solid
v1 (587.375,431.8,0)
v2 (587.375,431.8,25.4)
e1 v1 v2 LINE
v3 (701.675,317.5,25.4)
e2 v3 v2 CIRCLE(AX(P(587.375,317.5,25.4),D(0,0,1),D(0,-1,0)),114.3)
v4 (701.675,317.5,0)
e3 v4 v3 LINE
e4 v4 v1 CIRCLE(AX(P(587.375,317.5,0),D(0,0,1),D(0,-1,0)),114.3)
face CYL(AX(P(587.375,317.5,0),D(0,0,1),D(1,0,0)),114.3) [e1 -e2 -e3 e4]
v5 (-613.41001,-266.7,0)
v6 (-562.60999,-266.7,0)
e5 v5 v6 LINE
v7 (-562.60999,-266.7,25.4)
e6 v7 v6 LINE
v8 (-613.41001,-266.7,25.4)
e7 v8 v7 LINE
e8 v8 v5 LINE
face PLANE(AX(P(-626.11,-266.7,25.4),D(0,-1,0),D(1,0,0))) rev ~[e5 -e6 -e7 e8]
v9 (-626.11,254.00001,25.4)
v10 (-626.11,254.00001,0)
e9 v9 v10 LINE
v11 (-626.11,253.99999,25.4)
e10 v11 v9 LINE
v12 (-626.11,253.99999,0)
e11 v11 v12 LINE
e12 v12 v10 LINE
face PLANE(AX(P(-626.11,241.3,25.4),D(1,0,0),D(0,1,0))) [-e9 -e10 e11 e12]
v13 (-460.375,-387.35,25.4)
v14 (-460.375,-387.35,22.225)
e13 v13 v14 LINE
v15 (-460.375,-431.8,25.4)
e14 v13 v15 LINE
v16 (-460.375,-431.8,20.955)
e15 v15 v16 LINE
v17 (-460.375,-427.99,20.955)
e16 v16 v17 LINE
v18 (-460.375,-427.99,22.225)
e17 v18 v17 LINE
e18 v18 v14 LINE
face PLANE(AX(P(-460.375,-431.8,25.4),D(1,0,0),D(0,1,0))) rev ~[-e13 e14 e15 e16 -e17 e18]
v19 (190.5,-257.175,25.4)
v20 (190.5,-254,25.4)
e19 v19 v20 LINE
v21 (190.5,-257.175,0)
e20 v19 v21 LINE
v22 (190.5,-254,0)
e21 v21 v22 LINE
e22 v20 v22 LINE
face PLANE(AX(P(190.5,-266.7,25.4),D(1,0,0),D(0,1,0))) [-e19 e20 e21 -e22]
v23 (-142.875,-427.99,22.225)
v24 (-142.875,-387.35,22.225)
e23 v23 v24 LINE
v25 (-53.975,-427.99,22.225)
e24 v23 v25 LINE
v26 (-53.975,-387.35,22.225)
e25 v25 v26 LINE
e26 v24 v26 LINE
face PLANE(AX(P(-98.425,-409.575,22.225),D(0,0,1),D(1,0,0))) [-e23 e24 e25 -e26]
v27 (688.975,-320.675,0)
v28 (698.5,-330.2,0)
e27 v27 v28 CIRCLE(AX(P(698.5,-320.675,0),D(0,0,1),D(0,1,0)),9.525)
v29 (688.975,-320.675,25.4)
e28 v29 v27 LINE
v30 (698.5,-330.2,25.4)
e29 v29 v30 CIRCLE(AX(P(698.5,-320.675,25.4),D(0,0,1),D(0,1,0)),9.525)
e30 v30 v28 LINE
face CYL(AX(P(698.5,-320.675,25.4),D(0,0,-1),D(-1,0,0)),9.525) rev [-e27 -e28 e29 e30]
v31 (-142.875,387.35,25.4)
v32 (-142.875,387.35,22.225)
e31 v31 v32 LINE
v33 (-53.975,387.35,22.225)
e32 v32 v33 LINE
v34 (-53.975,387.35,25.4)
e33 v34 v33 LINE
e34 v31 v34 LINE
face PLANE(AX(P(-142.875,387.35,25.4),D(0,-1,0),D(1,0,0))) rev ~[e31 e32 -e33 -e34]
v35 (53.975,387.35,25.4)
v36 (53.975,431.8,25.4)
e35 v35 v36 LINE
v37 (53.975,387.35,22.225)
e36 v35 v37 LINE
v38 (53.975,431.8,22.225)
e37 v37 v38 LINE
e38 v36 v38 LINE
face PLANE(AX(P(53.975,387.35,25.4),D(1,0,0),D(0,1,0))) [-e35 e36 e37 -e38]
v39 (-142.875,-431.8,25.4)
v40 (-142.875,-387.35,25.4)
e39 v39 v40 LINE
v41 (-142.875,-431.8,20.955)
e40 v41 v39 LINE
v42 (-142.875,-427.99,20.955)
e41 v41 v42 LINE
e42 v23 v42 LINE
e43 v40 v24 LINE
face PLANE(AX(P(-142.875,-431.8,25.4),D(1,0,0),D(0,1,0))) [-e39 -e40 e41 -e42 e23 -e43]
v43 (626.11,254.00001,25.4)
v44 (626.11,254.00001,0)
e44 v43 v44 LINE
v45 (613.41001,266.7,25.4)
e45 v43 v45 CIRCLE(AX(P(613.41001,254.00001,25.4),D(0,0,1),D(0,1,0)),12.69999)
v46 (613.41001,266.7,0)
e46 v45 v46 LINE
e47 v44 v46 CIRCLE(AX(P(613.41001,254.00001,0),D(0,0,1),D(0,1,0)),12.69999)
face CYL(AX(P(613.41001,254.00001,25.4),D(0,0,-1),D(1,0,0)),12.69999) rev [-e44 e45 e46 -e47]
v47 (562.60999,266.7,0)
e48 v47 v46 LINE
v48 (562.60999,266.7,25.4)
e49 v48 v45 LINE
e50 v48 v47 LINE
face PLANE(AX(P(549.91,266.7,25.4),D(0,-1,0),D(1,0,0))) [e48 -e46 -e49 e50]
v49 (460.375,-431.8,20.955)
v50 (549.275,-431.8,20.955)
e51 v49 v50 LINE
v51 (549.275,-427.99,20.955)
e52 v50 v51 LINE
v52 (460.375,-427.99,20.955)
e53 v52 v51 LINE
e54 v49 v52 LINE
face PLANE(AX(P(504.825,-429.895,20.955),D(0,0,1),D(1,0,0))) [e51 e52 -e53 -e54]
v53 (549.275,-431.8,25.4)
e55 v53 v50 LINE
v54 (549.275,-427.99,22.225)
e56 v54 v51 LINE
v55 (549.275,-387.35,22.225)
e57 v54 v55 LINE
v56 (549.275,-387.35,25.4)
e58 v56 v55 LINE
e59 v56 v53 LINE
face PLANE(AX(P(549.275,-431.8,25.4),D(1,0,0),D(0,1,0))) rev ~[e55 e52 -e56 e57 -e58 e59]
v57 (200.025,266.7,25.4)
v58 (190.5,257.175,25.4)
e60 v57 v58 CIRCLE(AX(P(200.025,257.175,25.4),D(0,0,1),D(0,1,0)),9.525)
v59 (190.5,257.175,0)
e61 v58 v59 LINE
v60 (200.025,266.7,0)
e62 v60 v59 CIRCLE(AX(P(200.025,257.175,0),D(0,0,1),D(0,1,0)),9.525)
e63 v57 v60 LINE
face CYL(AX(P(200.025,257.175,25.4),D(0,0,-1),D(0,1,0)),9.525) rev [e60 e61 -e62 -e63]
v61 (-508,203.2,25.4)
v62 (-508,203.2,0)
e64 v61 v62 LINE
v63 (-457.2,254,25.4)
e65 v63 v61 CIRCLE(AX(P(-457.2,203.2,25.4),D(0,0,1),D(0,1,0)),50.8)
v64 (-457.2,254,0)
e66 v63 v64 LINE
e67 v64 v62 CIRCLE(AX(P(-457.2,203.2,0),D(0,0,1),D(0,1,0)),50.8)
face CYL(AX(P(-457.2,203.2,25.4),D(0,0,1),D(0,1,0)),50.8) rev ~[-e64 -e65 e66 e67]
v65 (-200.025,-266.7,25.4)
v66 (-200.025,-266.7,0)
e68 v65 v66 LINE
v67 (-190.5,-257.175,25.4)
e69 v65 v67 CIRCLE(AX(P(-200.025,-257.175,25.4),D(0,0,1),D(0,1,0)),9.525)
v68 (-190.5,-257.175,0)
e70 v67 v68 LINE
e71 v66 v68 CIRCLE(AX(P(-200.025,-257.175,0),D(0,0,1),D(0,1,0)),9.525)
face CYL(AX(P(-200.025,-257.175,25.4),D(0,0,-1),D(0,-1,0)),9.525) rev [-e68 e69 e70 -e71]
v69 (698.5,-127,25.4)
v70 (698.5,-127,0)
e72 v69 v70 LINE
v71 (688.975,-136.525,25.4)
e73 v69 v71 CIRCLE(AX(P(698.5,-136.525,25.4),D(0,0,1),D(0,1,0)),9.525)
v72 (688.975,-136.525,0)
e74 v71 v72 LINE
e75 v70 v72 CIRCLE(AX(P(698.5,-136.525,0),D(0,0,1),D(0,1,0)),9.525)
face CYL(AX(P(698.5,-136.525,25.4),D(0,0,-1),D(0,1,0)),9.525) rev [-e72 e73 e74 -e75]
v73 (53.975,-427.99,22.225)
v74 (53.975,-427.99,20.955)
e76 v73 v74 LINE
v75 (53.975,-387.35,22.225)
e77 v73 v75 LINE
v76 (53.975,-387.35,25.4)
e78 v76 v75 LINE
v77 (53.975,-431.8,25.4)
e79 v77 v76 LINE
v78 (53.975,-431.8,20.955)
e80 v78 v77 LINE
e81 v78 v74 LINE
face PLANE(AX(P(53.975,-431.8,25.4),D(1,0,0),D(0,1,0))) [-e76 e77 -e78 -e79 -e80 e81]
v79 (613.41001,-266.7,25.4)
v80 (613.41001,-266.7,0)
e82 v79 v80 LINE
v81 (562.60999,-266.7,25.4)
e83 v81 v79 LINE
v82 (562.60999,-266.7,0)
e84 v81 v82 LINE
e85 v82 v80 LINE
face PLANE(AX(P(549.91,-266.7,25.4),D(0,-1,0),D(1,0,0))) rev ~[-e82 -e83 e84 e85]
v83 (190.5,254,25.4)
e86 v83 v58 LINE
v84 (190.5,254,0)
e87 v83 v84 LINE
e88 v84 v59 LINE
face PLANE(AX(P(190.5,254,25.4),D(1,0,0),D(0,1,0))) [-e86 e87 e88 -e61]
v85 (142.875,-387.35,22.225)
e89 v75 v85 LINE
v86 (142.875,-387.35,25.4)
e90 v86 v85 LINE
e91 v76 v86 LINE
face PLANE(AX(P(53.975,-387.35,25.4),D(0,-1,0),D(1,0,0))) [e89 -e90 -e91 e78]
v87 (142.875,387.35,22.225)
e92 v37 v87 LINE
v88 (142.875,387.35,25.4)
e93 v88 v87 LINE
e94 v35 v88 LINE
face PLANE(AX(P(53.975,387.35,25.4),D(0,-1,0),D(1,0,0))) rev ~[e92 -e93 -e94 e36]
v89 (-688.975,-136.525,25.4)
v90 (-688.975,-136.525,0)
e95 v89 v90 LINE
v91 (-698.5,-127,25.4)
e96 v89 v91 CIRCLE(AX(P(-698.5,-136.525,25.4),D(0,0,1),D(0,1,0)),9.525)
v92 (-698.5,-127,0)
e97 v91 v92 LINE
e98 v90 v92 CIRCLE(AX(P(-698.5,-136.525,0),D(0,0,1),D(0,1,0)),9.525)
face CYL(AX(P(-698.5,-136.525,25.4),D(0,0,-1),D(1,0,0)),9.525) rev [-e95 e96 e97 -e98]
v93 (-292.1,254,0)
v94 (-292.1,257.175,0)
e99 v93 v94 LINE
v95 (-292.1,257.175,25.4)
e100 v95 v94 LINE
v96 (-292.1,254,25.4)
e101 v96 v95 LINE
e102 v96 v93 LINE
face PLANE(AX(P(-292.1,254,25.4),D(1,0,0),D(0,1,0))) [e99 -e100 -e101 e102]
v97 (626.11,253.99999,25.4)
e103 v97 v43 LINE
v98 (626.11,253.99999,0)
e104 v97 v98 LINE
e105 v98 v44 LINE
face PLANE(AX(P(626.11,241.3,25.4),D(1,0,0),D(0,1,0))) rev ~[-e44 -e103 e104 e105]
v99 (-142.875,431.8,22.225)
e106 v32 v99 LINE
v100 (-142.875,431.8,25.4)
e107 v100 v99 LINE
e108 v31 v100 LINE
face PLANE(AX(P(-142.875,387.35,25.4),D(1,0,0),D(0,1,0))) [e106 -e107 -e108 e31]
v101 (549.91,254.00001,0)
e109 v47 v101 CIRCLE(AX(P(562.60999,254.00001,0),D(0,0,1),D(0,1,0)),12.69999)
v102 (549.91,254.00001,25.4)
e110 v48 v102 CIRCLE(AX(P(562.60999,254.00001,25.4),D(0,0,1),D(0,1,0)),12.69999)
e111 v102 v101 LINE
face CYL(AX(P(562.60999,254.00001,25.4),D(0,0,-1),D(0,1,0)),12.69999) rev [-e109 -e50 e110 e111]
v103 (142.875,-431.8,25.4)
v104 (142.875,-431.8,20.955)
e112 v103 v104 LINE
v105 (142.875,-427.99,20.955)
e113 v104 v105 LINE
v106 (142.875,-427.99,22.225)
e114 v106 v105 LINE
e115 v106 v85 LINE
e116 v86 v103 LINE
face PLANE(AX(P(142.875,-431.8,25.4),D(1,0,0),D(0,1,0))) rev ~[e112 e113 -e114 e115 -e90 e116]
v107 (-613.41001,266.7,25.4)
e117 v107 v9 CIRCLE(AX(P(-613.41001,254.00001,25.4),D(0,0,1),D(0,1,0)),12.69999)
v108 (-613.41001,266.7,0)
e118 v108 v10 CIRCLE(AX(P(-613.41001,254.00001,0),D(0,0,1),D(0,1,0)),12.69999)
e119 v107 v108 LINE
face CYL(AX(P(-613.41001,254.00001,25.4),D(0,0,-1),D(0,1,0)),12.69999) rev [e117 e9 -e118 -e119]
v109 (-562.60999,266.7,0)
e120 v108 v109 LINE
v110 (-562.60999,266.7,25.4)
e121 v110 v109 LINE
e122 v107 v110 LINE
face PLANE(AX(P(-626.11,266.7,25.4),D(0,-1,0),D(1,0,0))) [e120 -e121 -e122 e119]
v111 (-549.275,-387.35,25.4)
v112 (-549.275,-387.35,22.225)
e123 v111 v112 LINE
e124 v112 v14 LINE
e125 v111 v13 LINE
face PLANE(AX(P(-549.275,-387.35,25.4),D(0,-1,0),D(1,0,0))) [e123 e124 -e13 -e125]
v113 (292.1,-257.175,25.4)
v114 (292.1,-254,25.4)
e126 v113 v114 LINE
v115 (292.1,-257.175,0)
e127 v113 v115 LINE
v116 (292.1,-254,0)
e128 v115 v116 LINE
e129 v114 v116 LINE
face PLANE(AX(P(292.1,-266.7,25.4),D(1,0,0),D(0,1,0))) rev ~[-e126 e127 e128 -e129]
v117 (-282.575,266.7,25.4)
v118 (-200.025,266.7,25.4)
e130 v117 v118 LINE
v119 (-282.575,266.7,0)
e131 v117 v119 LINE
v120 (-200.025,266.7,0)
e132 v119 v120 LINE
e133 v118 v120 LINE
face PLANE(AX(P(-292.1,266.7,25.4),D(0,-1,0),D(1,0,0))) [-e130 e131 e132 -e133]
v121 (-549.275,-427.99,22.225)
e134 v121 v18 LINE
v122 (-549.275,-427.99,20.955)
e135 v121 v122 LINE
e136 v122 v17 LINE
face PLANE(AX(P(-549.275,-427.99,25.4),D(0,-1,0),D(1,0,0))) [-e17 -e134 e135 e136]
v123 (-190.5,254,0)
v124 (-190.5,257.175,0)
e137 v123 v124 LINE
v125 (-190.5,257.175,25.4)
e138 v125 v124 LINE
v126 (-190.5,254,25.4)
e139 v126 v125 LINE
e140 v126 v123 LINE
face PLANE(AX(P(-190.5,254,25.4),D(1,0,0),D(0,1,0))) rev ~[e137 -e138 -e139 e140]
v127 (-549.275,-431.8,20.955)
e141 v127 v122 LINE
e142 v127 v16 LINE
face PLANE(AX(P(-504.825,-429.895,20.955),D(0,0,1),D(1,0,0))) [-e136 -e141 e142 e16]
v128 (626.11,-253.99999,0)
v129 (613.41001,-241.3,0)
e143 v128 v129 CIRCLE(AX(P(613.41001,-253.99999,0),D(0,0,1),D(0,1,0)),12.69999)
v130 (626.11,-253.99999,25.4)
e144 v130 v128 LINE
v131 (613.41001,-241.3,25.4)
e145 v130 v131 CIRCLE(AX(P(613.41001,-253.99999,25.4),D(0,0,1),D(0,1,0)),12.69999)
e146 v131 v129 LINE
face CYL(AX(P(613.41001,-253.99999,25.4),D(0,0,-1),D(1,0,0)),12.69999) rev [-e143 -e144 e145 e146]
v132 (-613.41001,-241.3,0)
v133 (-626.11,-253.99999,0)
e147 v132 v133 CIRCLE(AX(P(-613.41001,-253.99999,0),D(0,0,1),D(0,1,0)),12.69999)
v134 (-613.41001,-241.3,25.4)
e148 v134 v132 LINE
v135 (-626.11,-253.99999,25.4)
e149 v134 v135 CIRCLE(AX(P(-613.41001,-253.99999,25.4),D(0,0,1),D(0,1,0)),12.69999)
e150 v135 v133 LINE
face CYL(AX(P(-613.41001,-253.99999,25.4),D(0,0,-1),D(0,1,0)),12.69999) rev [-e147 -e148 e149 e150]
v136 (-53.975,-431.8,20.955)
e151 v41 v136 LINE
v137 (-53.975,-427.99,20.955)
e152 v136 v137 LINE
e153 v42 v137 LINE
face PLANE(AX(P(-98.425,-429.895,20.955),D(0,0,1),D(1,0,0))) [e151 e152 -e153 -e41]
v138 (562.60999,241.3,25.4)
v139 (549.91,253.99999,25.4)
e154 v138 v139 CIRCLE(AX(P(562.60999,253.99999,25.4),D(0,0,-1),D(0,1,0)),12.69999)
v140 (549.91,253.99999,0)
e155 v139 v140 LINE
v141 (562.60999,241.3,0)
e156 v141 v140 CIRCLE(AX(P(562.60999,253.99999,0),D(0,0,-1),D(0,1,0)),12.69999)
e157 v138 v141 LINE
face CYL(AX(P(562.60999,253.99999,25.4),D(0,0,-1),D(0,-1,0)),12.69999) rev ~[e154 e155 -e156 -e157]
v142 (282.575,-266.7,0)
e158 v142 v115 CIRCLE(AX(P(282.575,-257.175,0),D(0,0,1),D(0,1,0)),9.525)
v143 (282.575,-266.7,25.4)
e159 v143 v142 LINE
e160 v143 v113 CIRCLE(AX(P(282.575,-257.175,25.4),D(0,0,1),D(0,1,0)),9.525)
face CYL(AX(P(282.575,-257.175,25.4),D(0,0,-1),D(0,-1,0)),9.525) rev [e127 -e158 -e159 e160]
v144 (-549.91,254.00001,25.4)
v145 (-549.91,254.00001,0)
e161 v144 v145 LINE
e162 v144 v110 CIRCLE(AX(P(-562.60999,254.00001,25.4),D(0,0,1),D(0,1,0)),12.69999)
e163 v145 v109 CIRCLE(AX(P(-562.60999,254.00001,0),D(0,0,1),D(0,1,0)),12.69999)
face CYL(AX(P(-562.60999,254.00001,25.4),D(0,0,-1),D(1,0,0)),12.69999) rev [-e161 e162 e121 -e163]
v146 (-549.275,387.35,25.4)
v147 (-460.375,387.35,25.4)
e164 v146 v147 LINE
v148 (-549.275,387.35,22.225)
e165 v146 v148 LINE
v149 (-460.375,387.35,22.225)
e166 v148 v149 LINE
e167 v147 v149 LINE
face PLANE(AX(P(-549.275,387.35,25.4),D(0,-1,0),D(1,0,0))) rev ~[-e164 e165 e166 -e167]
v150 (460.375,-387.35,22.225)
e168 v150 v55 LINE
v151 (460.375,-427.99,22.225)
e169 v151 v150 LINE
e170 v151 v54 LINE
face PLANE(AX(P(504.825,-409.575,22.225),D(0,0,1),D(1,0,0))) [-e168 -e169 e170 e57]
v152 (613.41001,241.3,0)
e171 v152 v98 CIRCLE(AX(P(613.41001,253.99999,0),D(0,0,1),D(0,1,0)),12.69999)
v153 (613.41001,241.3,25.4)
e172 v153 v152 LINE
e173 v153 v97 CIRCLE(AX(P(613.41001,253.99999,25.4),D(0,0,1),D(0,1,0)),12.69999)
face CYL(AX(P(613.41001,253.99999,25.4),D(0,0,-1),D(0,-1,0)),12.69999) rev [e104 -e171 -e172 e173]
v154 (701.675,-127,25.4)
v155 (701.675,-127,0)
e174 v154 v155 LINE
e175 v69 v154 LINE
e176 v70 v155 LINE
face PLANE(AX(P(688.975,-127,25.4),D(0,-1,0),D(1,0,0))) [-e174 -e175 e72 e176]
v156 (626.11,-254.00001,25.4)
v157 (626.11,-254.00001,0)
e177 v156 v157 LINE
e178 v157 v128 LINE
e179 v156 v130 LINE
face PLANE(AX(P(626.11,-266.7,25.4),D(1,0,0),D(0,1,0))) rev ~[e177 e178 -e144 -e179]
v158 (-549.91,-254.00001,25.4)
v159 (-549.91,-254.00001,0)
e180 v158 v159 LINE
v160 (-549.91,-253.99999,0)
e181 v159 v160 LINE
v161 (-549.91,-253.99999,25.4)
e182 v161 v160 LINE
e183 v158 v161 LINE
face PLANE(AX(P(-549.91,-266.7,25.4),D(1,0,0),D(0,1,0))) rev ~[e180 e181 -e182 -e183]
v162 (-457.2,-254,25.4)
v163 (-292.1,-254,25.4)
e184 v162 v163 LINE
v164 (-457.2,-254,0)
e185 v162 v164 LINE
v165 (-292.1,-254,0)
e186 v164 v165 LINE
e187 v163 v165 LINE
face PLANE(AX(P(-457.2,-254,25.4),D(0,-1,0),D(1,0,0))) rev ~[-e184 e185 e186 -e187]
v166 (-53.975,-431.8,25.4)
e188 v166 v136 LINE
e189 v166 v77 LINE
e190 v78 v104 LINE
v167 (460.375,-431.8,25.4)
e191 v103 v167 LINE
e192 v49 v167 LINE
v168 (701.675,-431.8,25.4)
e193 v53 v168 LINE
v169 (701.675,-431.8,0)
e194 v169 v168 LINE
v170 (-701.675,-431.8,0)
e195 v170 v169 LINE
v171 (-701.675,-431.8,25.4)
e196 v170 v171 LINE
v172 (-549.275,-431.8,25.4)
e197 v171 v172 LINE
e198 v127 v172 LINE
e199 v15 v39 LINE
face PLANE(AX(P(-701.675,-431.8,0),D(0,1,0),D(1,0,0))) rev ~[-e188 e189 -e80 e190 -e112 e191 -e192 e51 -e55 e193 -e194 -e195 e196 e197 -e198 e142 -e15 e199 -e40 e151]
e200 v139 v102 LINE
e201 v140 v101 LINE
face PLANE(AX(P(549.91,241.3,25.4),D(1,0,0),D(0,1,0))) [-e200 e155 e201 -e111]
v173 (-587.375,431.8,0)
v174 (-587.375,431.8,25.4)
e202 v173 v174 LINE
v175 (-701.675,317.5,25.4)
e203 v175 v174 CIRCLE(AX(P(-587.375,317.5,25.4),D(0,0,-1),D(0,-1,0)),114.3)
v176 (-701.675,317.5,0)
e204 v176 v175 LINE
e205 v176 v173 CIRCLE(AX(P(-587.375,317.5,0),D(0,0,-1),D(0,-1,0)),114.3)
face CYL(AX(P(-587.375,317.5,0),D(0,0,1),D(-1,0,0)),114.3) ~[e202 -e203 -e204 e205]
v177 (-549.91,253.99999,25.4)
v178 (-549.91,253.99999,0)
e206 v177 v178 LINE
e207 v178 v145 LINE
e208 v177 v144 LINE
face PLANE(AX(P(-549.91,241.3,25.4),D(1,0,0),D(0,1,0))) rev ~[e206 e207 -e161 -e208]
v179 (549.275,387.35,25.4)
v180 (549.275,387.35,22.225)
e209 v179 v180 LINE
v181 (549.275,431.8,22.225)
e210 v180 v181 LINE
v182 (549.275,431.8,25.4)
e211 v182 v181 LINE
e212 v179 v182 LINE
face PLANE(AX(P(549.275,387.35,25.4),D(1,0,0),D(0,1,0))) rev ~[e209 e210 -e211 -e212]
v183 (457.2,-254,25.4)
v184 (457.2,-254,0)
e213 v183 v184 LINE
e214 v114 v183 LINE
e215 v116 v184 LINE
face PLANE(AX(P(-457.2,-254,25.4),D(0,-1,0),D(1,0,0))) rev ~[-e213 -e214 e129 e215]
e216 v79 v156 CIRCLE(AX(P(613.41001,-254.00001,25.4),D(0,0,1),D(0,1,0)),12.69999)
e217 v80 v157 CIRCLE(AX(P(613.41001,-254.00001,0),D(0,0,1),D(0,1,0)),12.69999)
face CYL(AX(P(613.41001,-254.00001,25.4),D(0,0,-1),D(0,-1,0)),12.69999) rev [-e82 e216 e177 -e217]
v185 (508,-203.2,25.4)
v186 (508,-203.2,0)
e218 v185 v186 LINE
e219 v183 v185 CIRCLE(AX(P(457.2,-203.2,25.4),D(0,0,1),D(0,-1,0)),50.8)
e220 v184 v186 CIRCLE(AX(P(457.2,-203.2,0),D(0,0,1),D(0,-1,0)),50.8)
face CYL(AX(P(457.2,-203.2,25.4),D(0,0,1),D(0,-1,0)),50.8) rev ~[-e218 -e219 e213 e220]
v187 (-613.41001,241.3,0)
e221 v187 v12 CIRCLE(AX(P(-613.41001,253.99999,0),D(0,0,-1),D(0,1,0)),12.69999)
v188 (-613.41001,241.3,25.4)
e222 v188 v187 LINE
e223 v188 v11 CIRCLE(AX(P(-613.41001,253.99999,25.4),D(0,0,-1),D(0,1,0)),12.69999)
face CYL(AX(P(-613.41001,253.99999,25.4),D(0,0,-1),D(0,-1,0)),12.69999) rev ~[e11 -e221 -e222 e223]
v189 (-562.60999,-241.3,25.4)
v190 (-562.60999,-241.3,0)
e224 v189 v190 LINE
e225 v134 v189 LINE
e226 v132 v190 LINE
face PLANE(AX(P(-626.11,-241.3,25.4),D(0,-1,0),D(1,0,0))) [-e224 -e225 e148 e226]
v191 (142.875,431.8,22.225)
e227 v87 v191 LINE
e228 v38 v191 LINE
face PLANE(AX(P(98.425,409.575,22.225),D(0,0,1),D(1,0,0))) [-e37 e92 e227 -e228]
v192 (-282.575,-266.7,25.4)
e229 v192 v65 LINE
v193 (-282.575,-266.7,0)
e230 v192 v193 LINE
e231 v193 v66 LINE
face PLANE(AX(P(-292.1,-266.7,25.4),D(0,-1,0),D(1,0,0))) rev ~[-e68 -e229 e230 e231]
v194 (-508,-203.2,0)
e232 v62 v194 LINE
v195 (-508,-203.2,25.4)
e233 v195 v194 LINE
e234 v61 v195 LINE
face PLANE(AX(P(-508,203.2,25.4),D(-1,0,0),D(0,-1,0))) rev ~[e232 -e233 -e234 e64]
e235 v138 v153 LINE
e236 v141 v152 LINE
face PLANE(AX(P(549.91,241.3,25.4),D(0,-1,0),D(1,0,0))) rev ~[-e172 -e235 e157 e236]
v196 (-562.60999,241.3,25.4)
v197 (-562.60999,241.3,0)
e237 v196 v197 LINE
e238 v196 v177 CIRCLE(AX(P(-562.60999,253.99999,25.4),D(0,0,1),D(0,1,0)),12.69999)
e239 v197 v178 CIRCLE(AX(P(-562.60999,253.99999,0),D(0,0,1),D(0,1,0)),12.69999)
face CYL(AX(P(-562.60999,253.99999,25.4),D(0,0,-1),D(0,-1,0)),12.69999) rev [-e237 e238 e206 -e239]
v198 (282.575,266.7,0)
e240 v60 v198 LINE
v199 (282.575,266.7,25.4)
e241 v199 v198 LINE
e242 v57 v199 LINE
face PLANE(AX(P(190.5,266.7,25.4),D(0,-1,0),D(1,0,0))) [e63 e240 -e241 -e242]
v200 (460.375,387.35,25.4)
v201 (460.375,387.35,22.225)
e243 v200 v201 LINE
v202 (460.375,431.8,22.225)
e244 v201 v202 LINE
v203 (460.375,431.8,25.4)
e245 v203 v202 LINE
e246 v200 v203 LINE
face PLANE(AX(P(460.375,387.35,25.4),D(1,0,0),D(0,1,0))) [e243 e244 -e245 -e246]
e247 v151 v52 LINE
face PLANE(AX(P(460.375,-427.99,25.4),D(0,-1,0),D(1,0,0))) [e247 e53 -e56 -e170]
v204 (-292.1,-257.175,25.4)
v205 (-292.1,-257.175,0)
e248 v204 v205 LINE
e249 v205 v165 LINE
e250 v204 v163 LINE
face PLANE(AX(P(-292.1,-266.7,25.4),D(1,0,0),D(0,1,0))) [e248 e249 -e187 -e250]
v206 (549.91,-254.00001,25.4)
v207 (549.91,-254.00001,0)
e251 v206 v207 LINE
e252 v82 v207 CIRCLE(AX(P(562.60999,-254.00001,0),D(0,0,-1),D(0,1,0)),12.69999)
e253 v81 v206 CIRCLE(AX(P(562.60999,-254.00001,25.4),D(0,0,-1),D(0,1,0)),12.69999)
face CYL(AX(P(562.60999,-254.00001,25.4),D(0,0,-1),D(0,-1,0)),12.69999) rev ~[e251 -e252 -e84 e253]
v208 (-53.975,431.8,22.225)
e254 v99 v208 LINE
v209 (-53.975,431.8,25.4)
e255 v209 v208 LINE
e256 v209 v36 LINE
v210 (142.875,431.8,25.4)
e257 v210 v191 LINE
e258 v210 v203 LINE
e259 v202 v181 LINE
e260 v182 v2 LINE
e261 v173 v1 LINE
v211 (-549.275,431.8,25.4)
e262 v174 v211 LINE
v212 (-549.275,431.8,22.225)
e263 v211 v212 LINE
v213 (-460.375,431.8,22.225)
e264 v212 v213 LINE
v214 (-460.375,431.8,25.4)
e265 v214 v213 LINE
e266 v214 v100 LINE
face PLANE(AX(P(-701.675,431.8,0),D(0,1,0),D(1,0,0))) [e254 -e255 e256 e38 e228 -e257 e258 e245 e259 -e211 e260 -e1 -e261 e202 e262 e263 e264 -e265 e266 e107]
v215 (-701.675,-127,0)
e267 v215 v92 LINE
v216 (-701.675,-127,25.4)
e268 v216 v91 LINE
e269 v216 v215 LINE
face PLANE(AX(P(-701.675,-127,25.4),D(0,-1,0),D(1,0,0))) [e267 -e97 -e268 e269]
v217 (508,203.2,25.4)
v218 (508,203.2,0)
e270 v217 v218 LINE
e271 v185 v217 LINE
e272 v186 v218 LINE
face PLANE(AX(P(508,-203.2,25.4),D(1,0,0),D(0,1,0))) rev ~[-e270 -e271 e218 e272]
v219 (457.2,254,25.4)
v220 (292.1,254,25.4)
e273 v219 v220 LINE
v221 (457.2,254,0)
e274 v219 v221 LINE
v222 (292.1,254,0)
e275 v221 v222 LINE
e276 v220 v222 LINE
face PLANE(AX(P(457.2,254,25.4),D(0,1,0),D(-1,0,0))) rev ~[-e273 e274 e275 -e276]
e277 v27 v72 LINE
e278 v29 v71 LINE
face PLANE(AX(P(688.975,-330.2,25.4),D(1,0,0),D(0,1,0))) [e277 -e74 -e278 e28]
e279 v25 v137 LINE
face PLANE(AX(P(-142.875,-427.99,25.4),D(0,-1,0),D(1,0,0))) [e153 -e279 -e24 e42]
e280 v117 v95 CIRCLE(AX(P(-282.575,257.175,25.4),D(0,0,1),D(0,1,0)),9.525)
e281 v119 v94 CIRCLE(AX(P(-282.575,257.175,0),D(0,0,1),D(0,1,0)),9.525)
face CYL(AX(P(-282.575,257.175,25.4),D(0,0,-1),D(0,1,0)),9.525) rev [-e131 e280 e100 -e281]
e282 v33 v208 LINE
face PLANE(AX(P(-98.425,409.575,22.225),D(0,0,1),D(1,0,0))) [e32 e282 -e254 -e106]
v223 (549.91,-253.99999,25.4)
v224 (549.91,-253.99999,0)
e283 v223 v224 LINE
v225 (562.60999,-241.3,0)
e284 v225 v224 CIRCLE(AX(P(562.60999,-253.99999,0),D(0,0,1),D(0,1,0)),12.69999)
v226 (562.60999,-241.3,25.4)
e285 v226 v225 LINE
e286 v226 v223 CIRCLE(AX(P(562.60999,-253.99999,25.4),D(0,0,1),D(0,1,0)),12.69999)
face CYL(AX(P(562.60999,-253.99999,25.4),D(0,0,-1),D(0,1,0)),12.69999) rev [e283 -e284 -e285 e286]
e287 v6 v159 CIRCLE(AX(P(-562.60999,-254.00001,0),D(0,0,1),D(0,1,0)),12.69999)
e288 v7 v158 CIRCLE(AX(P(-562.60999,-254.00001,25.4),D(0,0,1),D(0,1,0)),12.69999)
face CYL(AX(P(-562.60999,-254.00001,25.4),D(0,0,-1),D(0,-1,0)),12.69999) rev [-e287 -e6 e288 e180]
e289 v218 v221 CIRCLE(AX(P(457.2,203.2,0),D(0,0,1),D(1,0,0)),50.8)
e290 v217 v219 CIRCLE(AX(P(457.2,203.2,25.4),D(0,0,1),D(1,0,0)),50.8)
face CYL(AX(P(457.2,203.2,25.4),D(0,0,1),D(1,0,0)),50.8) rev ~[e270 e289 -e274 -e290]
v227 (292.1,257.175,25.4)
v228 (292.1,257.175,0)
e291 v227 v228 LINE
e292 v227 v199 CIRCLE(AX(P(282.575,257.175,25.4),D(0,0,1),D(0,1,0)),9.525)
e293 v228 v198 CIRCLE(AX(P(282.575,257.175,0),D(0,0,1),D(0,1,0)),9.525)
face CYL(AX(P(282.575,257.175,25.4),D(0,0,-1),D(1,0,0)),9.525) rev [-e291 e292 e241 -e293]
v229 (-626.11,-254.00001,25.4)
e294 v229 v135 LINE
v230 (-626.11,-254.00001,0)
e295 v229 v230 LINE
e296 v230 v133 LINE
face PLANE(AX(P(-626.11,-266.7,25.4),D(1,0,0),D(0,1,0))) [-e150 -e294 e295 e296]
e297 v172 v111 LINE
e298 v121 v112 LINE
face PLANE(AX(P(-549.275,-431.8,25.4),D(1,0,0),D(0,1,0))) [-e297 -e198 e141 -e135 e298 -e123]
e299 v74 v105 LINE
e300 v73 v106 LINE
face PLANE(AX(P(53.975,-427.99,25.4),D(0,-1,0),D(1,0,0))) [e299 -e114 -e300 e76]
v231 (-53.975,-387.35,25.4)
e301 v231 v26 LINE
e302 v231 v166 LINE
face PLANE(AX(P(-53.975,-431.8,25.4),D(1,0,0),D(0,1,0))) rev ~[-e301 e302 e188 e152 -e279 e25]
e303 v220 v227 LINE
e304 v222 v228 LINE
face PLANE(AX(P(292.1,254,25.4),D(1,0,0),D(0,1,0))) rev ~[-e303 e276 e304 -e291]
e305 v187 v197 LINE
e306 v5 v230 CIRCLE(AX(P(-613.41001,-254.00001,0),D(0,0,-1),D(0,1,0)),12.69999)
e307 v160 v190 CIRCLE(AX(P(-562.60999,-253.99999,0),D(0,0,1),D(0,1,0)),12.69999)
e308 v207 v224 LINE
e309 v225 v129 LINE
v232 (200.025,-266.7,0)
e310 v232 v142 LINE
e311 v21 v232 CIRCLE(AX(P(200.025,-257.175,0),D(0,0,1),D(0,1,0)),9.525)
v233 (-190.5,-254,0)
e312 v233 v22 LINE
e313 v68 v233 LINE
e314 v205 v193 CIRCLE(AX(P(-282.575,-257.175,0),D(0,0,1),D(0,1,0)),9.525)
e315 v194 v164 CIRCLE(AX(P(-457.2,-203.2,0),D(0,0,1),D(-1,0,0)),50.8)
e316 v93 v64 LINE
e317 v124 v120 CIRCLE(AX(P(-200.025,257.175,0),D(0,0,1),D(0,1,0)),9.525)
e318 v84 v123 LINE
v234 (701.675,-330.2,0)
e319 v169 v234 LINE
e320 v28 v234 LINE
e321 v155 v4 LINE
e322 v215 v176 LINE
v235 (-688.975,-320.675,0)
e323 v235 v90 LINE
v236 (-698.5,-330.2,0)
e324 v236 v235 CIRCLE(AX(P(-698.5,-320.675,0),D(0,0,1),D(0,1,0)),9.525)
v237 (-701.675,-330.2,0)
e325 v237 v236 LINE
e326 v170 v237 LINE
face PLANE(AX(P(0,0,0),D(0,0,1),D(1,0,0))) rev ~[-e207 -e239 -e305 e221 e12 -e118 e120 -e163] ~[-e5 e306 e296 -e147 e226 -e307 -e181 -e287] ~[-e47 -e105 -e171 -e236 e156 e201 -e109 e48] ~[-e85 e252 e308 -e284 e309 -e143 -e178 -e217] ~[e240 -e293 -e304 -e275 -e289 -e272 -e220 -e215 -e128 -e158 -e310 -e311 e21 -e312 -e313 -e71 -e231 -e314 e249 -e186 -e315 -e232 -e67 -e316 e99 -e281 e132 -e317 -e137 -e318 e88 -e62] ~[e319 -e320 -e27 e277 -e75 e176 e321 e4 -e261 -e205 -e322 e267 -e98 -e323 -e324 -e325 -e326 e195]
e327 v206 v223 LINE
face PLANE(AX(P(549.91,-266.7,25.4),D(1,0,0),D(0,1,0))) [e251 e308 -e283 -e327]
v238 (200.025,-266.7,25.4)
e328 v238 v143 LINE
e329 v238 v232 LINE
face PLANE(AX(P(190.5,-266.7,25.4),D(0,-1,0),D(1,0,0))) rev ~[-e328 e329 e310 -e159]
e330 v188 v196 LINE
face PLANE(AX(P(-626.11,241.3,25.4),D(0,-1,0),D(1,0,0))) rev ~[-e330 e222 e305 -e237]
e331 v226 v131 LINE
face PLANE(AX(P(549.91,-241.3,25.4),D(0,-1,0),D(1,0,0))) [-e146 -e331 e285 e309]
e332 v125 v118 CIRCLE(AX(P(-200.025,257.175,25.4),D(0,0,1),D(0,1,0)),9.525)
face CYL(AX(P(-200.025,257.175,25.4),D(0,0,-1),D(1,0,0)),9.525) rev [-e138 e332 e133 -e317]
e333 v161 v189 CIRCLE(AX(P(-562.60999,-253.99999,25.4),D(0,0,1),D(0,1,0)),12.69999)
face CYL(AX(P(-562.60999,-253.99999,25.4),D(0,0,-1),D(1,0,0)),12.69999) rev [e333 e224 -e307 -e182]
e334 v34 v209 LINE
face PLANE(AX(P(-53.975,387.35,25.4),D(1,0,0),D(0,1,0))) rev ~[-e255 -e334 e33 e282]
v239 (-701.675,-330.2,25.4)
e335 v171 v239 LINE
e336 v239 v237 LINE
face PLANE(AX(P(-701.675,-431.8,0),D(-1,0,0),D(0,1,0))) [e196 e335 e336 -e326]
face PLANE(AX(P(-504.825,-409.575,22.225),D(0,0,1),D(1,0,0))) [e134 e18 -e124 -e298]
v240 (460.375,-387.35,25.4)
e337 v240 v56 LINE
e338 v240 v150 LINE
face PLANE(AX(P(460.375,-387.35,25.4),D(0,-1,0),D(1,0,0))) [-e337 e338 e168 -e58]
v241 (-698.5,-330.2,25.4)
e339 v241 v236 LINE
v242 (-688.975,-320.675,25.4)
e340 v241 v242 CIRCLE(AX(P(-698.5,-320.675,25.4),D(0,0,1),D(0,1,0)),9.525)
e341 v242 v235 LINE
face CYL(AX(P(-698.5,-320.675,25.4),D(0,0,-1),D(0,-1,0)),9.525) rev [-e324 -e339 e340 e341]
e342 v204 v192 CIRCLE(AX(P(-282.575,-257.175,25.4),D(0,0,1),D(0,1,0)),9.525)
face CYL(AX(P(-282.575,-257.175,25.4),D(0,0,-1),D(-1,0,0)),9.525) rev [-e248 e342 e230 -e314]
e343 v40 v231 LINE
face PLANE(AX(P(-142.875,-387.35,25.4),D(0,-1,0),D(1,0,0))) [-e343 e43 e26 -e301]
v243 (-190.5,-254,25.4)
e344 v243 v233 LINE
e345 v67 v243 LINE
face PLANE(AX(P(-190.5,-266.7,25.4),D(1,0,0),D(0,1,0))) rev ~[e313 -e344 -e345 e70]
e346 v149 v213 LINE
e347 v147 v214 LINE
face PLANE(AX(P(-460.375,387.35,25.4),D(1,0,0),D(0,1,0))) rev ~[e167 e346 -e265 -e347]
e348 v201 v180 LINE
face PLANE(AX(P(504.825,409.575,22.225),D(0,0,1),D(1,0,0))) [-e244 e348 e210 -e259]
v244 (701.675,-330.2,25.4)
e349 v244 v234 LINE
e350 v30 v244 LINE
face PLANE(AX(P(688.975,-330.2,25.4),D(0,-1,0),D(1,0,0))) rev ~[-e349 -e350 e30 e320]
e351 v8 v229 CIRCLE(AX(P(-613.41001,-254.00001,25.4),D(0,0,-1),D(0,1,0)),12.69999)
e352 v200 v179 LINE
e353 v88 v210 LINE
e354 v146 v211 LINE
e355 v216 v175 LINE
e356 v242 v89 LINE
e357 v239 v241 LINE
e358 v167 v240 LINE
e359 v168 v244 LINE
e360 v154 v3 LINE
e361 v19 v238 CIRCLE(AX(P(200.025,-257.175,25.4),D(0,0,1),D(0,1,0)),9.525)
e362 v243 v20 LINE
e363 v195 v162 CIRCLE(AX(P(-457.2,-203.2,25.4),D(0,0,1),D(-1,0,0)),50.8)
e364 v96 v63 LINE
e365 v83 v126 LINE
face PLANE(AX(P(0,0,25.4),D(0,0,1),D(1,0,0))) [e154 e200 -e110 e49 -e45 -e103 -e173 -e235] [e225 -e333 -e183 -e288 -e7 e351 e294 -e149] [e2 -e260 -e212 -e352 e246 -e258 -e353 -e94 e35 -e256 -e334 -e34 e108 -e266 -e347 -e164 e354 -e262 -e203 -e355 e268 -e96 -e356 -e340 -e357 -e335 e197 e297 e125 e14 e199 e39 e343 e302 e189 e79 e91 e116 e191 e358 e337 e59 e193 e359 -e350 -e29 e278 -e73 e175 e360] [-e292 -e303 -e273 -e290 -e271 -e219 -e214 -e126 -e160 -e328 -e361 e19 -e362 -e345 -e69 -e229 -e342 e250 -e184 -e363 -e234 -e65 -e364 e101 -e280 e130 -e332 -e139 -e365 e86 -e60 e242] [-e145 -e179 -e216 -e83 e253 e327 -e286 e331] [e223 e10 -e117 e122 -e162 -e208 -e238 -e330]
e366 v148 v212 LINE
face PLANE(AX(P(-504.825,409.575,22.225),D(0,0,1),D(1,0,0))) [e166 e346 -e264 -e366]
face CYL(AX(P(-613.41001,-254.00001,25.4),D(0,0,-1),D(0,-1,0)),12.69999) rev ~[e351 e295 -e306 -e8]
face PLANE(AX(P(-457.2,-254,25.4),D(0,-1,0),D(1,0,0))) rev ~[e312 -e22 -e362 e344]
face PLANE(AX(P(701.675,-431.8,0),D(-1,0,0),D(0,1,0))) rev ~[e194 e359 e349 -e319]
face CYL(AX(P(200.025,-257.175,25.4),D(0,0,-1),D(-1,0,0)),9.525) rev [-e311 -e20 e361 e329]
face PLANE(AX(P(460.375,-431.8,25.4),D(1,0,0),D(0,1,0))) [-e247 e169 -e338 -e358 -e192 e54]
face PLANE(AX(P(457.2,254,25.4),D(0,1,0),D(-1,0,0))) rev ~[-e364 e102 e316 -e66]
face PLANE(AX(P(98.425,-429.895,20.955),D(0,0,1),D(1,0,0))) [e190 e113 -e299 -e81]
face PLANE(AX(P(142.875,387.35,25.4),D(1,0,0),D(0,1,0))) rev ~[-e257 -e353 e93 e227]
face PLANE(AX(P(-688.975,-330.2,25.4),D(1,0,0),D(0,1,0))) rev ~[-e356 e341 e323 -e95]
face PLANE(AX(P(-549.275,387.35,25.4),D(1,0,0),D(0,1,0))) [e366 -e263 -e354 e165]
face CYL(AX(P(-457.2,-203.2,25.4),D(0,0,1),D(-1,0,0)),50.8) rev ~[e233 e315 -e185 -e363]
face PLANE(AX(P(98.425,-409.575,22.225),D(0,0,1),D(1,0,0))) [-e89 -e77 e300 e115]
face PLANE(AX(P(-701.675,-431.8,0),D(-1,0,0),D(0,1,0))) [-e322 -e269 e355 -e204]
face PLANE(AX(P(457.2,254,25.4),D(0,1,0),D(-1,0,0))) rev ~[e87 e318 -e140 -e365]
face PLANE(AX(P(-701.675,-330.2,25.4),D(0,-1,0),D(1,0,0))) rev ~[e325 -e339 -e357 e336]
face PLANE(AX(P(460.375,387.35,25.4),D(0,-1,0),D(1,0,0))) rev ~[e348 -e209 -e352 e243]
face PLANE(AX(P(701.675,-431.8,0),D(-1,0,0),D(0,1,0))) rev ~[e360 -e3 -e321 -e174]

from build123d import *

# Parameters (mm, degrees)
F0_W      = 1403.35
F0_H      = 863.6
F1_DEPTH  = 25.4
F3_DEPTH  = 25.4
F4_W      = 88.9
F4_H      = 44.45
F5_DEPTH  = 3.175
F6_W      = 88.9
F6_H      = 3.81
F7_DEPTH  = 4.445
F8_R      = 114.3
F9_W      = 88.9
F9_H      = 44.45
F10_DEPTH = 3.175
F11_W     = 12.7
F11_H     = 203.2
F12_DEPTH = 25.401
F13_R     = 9.525
F14_W     = 101.6
F14_H     = 12.7
F15_DEPTH = 25.401
F16_R     = 9.525
F17_W     = 76.2
F17_H     = 25.4
F18_DEPTH = 25.401
F19_R     = 12.69999


# Not quite as in the source:
# - a fillet or chamfer is up to 0.001 mm smaller than in the source, because OpenCascade refuses the exact size


with BuildPart() as f1:
    # F0 (on Top) → F1 (new body)
    with BuildSketch(Plane.XY):
        Rectangle(F0_W, F0_H)
    extrude(amount=F1_DEPTH)

    # F2 (on face) → F3 (cut)
    with BuildSketch(Plane.XY.offset(25.4)):
        with BuildLine():
            Line((457.2, 254), (-457.2, 254))
            ThreePointArc((-457.2, 254), (-493.1210244843, 239.1210244843), (-508, 203.2))
            Line((-508, 203.2), (-508, -203.2))
            ThreePointArc((-508, -203.2), (-493.1210244843, -239.1210244843), (-457.2, -254))
            Line((-457.2, -254), (457.2, -254))
            ThreePointArc((457.2, -254), (493.1210244843, -239.1210244843), (508, -203.2))
            Line((508, -203.2), (508, 203.2))
            ThreePointArc((508, 203.2), (493.1210244843, 239.1210244843), (457.2, 254))
        make_face()
    extrude(amount=-F3_DEPTH, mode=Mode.SUBTRACT)

    # F4 (on face) → F5 (cut)
    with BuildSketch(Plane.XY.offset(25.4)):
        with Locations((-504.825, -409.575)):
            Rectangle(F4_W, F4_H)
        with Locations((-98.425, -409.575)):
            Rectangle(F4_W, F4_H)
        with Locations((98.425, -409.575)):
            Rectangle(F4_W, F4_H)
        with Locations((504.825, -409.575)):
            Rectangle(F4_W, F4_H)
    extrude(amount=-F5_DEPTH, mode=Mode.SUBTRACT)

    # F6 (on face) → F7 (cut)
    with BuildSketch(Plane.XY.offset(25.4)):
        with Locations((-504.825, -429.895)):
            Rectangle(F6_W, F6_H)
        with Locations((-98.425, -429.895)):
            Rectangle(F6_W, F6_H)
        with Locations((98.425, -429.895)):
            Rectangle(F6_W, F6_H)
        with Locations((504.825, -429.895)):
            Rectangle(F6_W, F6_H)
    extrude(amount=-F7_DEPTH, mode=Mode.SUBTRACT)

    # F8
    f8_edges = [f1.edges().sort_by_distance(p)[0] for p in [
        (701.675, 431.8, 12.7),
        (-701.675, 431.8, 12.7),
    ]]
    fillet(f8_edges, radius=F8_R)

    # F9 (on face) → F10 (cut)
    with BuildSketch(Plane.XY.offset(25.4)):
        with Locations((98.425, 409.575)):
            Rectangle(F9_W, F9_H)
        with Locations((504.825, 409.575)):
            Rectangle(F9_W, F9_H)
        with Locations((-98.425, 409.575)):
            Rectangle(F9_W, F9_H)
        with Locations((-504.825, 409.575)):
            Rectangle(F9_W, F9_H)
    extrude(amount=-F10_DEPTH, mode=Mode.SUBTRACT)

    # F11 (on face) → F12 (cut, through all)
    with BuildSketch(Plane.XY.offset(25.4)):
        with Locations((-695.325, -228.6)):
            Rectangle(F11_W, F11_H)
        with Locations((695.325, -228.6)):
            Rectangle(F11_W, F11_H)
    extrude(amount=-F12_DEPTH, mode=Mode.SUBTRACT)

    # F13
    f13_edges = [f1.edges().sort_by_distance(p)[0] for p in [
        (-688.975, -127, 12.7),
        (-688.975, -330.2, 12.7),
        (688.975, -127, 12.7),
        (688.975, -330.2, 12.7),
    ]]
    fillet(f13_edges, radius=F13_R)

    # F14 (on face) → F15 (cut, through all)
    with BuildSketch(Plane.XY.offset(25.4)):
        with Locations((-241.3, -260.35)):
            Rectangle(F14_W, F14_H)
        with Locations((241.3, -260.35)):
            Rectangle(F14_W, F14_H)
        with Locations((-241.3, 260.35)):
            Rectangle(F14_W, F14_H)
        with Locations((241.3, 260.35)):
            Rectangle(F14_W, F14_H)
    extrude(amount=-F15_DEPTH, mode=Mode.SUBTRACT)

    # F16
    f16_edges = [f1.edges().sort_by_distance(p)[0] for p in [
        (-292.1, -266.7, 12.7),
        (190.5, -266.7, 12.7),
        (292.1, -266.7, 12.7),
        (-190.5, -266.7, 12.7),
        (190.5, 266.7, 12.7),
        (-292.1, 266.7, 12.7),
        (-190.5, 266.7, 12.7),
        (292.1, 266.7, 12.7),
    ]]
    fillet(f16_edges, radius=F16_R)

    # F17 (on face) → F18 (cut, through all)
    with BuildSketch(Plane.XY.offset(25.4)):
        with Locations((-588.01, 254)):
            Rectangle(F17_W, F17_H)
        with Locations((588.01, 254)):
            Rectangle(F17_W, F17_H)
        with Locations((588.01, -254)):
            Rectangle(F17_W, F17_H)
        with Locations((-588.01, -254)):
            Rectangle(F17_W, F17_H)
    extrude(amount=-F18_DEPTH, mode=Mode.SUBTRACT)

    # F19 (radius 12.7 in the source; OpenCascade refuses exactly that, so slightly less here)
    f19_edges = [f1.edges().sort_by_distance(p)[0] for p in [
        (-626.11, 241.3, 12.7),
        (-549.91, 241.3, 12.7),
        (-549.91, 266.7, 12.7),
        (-626.11, 266.7, 12.7),
        (-626.11, -241.3, 12.7),
        (-626.11, -266.7, 12.7),
        (-549.91, -266.7, 12.7),
        (-549.91, -241.3, 12.7),
        (626.11, -241.3, 12.7),
        (626.11, -266.7, 12.7),
        (549.91, -266.7, 12.7),
        (549.91, -241.3, 12.7),
        (549.91, 266.7, 12.7),
        (549.91, 241.3, 12.7),
        (626.11, 241.3, 12.7),
        (626.11, 266.7, 12.7),
    ]]
    fillet(f19_edges, radius=F19_R)


solid = f1.part
